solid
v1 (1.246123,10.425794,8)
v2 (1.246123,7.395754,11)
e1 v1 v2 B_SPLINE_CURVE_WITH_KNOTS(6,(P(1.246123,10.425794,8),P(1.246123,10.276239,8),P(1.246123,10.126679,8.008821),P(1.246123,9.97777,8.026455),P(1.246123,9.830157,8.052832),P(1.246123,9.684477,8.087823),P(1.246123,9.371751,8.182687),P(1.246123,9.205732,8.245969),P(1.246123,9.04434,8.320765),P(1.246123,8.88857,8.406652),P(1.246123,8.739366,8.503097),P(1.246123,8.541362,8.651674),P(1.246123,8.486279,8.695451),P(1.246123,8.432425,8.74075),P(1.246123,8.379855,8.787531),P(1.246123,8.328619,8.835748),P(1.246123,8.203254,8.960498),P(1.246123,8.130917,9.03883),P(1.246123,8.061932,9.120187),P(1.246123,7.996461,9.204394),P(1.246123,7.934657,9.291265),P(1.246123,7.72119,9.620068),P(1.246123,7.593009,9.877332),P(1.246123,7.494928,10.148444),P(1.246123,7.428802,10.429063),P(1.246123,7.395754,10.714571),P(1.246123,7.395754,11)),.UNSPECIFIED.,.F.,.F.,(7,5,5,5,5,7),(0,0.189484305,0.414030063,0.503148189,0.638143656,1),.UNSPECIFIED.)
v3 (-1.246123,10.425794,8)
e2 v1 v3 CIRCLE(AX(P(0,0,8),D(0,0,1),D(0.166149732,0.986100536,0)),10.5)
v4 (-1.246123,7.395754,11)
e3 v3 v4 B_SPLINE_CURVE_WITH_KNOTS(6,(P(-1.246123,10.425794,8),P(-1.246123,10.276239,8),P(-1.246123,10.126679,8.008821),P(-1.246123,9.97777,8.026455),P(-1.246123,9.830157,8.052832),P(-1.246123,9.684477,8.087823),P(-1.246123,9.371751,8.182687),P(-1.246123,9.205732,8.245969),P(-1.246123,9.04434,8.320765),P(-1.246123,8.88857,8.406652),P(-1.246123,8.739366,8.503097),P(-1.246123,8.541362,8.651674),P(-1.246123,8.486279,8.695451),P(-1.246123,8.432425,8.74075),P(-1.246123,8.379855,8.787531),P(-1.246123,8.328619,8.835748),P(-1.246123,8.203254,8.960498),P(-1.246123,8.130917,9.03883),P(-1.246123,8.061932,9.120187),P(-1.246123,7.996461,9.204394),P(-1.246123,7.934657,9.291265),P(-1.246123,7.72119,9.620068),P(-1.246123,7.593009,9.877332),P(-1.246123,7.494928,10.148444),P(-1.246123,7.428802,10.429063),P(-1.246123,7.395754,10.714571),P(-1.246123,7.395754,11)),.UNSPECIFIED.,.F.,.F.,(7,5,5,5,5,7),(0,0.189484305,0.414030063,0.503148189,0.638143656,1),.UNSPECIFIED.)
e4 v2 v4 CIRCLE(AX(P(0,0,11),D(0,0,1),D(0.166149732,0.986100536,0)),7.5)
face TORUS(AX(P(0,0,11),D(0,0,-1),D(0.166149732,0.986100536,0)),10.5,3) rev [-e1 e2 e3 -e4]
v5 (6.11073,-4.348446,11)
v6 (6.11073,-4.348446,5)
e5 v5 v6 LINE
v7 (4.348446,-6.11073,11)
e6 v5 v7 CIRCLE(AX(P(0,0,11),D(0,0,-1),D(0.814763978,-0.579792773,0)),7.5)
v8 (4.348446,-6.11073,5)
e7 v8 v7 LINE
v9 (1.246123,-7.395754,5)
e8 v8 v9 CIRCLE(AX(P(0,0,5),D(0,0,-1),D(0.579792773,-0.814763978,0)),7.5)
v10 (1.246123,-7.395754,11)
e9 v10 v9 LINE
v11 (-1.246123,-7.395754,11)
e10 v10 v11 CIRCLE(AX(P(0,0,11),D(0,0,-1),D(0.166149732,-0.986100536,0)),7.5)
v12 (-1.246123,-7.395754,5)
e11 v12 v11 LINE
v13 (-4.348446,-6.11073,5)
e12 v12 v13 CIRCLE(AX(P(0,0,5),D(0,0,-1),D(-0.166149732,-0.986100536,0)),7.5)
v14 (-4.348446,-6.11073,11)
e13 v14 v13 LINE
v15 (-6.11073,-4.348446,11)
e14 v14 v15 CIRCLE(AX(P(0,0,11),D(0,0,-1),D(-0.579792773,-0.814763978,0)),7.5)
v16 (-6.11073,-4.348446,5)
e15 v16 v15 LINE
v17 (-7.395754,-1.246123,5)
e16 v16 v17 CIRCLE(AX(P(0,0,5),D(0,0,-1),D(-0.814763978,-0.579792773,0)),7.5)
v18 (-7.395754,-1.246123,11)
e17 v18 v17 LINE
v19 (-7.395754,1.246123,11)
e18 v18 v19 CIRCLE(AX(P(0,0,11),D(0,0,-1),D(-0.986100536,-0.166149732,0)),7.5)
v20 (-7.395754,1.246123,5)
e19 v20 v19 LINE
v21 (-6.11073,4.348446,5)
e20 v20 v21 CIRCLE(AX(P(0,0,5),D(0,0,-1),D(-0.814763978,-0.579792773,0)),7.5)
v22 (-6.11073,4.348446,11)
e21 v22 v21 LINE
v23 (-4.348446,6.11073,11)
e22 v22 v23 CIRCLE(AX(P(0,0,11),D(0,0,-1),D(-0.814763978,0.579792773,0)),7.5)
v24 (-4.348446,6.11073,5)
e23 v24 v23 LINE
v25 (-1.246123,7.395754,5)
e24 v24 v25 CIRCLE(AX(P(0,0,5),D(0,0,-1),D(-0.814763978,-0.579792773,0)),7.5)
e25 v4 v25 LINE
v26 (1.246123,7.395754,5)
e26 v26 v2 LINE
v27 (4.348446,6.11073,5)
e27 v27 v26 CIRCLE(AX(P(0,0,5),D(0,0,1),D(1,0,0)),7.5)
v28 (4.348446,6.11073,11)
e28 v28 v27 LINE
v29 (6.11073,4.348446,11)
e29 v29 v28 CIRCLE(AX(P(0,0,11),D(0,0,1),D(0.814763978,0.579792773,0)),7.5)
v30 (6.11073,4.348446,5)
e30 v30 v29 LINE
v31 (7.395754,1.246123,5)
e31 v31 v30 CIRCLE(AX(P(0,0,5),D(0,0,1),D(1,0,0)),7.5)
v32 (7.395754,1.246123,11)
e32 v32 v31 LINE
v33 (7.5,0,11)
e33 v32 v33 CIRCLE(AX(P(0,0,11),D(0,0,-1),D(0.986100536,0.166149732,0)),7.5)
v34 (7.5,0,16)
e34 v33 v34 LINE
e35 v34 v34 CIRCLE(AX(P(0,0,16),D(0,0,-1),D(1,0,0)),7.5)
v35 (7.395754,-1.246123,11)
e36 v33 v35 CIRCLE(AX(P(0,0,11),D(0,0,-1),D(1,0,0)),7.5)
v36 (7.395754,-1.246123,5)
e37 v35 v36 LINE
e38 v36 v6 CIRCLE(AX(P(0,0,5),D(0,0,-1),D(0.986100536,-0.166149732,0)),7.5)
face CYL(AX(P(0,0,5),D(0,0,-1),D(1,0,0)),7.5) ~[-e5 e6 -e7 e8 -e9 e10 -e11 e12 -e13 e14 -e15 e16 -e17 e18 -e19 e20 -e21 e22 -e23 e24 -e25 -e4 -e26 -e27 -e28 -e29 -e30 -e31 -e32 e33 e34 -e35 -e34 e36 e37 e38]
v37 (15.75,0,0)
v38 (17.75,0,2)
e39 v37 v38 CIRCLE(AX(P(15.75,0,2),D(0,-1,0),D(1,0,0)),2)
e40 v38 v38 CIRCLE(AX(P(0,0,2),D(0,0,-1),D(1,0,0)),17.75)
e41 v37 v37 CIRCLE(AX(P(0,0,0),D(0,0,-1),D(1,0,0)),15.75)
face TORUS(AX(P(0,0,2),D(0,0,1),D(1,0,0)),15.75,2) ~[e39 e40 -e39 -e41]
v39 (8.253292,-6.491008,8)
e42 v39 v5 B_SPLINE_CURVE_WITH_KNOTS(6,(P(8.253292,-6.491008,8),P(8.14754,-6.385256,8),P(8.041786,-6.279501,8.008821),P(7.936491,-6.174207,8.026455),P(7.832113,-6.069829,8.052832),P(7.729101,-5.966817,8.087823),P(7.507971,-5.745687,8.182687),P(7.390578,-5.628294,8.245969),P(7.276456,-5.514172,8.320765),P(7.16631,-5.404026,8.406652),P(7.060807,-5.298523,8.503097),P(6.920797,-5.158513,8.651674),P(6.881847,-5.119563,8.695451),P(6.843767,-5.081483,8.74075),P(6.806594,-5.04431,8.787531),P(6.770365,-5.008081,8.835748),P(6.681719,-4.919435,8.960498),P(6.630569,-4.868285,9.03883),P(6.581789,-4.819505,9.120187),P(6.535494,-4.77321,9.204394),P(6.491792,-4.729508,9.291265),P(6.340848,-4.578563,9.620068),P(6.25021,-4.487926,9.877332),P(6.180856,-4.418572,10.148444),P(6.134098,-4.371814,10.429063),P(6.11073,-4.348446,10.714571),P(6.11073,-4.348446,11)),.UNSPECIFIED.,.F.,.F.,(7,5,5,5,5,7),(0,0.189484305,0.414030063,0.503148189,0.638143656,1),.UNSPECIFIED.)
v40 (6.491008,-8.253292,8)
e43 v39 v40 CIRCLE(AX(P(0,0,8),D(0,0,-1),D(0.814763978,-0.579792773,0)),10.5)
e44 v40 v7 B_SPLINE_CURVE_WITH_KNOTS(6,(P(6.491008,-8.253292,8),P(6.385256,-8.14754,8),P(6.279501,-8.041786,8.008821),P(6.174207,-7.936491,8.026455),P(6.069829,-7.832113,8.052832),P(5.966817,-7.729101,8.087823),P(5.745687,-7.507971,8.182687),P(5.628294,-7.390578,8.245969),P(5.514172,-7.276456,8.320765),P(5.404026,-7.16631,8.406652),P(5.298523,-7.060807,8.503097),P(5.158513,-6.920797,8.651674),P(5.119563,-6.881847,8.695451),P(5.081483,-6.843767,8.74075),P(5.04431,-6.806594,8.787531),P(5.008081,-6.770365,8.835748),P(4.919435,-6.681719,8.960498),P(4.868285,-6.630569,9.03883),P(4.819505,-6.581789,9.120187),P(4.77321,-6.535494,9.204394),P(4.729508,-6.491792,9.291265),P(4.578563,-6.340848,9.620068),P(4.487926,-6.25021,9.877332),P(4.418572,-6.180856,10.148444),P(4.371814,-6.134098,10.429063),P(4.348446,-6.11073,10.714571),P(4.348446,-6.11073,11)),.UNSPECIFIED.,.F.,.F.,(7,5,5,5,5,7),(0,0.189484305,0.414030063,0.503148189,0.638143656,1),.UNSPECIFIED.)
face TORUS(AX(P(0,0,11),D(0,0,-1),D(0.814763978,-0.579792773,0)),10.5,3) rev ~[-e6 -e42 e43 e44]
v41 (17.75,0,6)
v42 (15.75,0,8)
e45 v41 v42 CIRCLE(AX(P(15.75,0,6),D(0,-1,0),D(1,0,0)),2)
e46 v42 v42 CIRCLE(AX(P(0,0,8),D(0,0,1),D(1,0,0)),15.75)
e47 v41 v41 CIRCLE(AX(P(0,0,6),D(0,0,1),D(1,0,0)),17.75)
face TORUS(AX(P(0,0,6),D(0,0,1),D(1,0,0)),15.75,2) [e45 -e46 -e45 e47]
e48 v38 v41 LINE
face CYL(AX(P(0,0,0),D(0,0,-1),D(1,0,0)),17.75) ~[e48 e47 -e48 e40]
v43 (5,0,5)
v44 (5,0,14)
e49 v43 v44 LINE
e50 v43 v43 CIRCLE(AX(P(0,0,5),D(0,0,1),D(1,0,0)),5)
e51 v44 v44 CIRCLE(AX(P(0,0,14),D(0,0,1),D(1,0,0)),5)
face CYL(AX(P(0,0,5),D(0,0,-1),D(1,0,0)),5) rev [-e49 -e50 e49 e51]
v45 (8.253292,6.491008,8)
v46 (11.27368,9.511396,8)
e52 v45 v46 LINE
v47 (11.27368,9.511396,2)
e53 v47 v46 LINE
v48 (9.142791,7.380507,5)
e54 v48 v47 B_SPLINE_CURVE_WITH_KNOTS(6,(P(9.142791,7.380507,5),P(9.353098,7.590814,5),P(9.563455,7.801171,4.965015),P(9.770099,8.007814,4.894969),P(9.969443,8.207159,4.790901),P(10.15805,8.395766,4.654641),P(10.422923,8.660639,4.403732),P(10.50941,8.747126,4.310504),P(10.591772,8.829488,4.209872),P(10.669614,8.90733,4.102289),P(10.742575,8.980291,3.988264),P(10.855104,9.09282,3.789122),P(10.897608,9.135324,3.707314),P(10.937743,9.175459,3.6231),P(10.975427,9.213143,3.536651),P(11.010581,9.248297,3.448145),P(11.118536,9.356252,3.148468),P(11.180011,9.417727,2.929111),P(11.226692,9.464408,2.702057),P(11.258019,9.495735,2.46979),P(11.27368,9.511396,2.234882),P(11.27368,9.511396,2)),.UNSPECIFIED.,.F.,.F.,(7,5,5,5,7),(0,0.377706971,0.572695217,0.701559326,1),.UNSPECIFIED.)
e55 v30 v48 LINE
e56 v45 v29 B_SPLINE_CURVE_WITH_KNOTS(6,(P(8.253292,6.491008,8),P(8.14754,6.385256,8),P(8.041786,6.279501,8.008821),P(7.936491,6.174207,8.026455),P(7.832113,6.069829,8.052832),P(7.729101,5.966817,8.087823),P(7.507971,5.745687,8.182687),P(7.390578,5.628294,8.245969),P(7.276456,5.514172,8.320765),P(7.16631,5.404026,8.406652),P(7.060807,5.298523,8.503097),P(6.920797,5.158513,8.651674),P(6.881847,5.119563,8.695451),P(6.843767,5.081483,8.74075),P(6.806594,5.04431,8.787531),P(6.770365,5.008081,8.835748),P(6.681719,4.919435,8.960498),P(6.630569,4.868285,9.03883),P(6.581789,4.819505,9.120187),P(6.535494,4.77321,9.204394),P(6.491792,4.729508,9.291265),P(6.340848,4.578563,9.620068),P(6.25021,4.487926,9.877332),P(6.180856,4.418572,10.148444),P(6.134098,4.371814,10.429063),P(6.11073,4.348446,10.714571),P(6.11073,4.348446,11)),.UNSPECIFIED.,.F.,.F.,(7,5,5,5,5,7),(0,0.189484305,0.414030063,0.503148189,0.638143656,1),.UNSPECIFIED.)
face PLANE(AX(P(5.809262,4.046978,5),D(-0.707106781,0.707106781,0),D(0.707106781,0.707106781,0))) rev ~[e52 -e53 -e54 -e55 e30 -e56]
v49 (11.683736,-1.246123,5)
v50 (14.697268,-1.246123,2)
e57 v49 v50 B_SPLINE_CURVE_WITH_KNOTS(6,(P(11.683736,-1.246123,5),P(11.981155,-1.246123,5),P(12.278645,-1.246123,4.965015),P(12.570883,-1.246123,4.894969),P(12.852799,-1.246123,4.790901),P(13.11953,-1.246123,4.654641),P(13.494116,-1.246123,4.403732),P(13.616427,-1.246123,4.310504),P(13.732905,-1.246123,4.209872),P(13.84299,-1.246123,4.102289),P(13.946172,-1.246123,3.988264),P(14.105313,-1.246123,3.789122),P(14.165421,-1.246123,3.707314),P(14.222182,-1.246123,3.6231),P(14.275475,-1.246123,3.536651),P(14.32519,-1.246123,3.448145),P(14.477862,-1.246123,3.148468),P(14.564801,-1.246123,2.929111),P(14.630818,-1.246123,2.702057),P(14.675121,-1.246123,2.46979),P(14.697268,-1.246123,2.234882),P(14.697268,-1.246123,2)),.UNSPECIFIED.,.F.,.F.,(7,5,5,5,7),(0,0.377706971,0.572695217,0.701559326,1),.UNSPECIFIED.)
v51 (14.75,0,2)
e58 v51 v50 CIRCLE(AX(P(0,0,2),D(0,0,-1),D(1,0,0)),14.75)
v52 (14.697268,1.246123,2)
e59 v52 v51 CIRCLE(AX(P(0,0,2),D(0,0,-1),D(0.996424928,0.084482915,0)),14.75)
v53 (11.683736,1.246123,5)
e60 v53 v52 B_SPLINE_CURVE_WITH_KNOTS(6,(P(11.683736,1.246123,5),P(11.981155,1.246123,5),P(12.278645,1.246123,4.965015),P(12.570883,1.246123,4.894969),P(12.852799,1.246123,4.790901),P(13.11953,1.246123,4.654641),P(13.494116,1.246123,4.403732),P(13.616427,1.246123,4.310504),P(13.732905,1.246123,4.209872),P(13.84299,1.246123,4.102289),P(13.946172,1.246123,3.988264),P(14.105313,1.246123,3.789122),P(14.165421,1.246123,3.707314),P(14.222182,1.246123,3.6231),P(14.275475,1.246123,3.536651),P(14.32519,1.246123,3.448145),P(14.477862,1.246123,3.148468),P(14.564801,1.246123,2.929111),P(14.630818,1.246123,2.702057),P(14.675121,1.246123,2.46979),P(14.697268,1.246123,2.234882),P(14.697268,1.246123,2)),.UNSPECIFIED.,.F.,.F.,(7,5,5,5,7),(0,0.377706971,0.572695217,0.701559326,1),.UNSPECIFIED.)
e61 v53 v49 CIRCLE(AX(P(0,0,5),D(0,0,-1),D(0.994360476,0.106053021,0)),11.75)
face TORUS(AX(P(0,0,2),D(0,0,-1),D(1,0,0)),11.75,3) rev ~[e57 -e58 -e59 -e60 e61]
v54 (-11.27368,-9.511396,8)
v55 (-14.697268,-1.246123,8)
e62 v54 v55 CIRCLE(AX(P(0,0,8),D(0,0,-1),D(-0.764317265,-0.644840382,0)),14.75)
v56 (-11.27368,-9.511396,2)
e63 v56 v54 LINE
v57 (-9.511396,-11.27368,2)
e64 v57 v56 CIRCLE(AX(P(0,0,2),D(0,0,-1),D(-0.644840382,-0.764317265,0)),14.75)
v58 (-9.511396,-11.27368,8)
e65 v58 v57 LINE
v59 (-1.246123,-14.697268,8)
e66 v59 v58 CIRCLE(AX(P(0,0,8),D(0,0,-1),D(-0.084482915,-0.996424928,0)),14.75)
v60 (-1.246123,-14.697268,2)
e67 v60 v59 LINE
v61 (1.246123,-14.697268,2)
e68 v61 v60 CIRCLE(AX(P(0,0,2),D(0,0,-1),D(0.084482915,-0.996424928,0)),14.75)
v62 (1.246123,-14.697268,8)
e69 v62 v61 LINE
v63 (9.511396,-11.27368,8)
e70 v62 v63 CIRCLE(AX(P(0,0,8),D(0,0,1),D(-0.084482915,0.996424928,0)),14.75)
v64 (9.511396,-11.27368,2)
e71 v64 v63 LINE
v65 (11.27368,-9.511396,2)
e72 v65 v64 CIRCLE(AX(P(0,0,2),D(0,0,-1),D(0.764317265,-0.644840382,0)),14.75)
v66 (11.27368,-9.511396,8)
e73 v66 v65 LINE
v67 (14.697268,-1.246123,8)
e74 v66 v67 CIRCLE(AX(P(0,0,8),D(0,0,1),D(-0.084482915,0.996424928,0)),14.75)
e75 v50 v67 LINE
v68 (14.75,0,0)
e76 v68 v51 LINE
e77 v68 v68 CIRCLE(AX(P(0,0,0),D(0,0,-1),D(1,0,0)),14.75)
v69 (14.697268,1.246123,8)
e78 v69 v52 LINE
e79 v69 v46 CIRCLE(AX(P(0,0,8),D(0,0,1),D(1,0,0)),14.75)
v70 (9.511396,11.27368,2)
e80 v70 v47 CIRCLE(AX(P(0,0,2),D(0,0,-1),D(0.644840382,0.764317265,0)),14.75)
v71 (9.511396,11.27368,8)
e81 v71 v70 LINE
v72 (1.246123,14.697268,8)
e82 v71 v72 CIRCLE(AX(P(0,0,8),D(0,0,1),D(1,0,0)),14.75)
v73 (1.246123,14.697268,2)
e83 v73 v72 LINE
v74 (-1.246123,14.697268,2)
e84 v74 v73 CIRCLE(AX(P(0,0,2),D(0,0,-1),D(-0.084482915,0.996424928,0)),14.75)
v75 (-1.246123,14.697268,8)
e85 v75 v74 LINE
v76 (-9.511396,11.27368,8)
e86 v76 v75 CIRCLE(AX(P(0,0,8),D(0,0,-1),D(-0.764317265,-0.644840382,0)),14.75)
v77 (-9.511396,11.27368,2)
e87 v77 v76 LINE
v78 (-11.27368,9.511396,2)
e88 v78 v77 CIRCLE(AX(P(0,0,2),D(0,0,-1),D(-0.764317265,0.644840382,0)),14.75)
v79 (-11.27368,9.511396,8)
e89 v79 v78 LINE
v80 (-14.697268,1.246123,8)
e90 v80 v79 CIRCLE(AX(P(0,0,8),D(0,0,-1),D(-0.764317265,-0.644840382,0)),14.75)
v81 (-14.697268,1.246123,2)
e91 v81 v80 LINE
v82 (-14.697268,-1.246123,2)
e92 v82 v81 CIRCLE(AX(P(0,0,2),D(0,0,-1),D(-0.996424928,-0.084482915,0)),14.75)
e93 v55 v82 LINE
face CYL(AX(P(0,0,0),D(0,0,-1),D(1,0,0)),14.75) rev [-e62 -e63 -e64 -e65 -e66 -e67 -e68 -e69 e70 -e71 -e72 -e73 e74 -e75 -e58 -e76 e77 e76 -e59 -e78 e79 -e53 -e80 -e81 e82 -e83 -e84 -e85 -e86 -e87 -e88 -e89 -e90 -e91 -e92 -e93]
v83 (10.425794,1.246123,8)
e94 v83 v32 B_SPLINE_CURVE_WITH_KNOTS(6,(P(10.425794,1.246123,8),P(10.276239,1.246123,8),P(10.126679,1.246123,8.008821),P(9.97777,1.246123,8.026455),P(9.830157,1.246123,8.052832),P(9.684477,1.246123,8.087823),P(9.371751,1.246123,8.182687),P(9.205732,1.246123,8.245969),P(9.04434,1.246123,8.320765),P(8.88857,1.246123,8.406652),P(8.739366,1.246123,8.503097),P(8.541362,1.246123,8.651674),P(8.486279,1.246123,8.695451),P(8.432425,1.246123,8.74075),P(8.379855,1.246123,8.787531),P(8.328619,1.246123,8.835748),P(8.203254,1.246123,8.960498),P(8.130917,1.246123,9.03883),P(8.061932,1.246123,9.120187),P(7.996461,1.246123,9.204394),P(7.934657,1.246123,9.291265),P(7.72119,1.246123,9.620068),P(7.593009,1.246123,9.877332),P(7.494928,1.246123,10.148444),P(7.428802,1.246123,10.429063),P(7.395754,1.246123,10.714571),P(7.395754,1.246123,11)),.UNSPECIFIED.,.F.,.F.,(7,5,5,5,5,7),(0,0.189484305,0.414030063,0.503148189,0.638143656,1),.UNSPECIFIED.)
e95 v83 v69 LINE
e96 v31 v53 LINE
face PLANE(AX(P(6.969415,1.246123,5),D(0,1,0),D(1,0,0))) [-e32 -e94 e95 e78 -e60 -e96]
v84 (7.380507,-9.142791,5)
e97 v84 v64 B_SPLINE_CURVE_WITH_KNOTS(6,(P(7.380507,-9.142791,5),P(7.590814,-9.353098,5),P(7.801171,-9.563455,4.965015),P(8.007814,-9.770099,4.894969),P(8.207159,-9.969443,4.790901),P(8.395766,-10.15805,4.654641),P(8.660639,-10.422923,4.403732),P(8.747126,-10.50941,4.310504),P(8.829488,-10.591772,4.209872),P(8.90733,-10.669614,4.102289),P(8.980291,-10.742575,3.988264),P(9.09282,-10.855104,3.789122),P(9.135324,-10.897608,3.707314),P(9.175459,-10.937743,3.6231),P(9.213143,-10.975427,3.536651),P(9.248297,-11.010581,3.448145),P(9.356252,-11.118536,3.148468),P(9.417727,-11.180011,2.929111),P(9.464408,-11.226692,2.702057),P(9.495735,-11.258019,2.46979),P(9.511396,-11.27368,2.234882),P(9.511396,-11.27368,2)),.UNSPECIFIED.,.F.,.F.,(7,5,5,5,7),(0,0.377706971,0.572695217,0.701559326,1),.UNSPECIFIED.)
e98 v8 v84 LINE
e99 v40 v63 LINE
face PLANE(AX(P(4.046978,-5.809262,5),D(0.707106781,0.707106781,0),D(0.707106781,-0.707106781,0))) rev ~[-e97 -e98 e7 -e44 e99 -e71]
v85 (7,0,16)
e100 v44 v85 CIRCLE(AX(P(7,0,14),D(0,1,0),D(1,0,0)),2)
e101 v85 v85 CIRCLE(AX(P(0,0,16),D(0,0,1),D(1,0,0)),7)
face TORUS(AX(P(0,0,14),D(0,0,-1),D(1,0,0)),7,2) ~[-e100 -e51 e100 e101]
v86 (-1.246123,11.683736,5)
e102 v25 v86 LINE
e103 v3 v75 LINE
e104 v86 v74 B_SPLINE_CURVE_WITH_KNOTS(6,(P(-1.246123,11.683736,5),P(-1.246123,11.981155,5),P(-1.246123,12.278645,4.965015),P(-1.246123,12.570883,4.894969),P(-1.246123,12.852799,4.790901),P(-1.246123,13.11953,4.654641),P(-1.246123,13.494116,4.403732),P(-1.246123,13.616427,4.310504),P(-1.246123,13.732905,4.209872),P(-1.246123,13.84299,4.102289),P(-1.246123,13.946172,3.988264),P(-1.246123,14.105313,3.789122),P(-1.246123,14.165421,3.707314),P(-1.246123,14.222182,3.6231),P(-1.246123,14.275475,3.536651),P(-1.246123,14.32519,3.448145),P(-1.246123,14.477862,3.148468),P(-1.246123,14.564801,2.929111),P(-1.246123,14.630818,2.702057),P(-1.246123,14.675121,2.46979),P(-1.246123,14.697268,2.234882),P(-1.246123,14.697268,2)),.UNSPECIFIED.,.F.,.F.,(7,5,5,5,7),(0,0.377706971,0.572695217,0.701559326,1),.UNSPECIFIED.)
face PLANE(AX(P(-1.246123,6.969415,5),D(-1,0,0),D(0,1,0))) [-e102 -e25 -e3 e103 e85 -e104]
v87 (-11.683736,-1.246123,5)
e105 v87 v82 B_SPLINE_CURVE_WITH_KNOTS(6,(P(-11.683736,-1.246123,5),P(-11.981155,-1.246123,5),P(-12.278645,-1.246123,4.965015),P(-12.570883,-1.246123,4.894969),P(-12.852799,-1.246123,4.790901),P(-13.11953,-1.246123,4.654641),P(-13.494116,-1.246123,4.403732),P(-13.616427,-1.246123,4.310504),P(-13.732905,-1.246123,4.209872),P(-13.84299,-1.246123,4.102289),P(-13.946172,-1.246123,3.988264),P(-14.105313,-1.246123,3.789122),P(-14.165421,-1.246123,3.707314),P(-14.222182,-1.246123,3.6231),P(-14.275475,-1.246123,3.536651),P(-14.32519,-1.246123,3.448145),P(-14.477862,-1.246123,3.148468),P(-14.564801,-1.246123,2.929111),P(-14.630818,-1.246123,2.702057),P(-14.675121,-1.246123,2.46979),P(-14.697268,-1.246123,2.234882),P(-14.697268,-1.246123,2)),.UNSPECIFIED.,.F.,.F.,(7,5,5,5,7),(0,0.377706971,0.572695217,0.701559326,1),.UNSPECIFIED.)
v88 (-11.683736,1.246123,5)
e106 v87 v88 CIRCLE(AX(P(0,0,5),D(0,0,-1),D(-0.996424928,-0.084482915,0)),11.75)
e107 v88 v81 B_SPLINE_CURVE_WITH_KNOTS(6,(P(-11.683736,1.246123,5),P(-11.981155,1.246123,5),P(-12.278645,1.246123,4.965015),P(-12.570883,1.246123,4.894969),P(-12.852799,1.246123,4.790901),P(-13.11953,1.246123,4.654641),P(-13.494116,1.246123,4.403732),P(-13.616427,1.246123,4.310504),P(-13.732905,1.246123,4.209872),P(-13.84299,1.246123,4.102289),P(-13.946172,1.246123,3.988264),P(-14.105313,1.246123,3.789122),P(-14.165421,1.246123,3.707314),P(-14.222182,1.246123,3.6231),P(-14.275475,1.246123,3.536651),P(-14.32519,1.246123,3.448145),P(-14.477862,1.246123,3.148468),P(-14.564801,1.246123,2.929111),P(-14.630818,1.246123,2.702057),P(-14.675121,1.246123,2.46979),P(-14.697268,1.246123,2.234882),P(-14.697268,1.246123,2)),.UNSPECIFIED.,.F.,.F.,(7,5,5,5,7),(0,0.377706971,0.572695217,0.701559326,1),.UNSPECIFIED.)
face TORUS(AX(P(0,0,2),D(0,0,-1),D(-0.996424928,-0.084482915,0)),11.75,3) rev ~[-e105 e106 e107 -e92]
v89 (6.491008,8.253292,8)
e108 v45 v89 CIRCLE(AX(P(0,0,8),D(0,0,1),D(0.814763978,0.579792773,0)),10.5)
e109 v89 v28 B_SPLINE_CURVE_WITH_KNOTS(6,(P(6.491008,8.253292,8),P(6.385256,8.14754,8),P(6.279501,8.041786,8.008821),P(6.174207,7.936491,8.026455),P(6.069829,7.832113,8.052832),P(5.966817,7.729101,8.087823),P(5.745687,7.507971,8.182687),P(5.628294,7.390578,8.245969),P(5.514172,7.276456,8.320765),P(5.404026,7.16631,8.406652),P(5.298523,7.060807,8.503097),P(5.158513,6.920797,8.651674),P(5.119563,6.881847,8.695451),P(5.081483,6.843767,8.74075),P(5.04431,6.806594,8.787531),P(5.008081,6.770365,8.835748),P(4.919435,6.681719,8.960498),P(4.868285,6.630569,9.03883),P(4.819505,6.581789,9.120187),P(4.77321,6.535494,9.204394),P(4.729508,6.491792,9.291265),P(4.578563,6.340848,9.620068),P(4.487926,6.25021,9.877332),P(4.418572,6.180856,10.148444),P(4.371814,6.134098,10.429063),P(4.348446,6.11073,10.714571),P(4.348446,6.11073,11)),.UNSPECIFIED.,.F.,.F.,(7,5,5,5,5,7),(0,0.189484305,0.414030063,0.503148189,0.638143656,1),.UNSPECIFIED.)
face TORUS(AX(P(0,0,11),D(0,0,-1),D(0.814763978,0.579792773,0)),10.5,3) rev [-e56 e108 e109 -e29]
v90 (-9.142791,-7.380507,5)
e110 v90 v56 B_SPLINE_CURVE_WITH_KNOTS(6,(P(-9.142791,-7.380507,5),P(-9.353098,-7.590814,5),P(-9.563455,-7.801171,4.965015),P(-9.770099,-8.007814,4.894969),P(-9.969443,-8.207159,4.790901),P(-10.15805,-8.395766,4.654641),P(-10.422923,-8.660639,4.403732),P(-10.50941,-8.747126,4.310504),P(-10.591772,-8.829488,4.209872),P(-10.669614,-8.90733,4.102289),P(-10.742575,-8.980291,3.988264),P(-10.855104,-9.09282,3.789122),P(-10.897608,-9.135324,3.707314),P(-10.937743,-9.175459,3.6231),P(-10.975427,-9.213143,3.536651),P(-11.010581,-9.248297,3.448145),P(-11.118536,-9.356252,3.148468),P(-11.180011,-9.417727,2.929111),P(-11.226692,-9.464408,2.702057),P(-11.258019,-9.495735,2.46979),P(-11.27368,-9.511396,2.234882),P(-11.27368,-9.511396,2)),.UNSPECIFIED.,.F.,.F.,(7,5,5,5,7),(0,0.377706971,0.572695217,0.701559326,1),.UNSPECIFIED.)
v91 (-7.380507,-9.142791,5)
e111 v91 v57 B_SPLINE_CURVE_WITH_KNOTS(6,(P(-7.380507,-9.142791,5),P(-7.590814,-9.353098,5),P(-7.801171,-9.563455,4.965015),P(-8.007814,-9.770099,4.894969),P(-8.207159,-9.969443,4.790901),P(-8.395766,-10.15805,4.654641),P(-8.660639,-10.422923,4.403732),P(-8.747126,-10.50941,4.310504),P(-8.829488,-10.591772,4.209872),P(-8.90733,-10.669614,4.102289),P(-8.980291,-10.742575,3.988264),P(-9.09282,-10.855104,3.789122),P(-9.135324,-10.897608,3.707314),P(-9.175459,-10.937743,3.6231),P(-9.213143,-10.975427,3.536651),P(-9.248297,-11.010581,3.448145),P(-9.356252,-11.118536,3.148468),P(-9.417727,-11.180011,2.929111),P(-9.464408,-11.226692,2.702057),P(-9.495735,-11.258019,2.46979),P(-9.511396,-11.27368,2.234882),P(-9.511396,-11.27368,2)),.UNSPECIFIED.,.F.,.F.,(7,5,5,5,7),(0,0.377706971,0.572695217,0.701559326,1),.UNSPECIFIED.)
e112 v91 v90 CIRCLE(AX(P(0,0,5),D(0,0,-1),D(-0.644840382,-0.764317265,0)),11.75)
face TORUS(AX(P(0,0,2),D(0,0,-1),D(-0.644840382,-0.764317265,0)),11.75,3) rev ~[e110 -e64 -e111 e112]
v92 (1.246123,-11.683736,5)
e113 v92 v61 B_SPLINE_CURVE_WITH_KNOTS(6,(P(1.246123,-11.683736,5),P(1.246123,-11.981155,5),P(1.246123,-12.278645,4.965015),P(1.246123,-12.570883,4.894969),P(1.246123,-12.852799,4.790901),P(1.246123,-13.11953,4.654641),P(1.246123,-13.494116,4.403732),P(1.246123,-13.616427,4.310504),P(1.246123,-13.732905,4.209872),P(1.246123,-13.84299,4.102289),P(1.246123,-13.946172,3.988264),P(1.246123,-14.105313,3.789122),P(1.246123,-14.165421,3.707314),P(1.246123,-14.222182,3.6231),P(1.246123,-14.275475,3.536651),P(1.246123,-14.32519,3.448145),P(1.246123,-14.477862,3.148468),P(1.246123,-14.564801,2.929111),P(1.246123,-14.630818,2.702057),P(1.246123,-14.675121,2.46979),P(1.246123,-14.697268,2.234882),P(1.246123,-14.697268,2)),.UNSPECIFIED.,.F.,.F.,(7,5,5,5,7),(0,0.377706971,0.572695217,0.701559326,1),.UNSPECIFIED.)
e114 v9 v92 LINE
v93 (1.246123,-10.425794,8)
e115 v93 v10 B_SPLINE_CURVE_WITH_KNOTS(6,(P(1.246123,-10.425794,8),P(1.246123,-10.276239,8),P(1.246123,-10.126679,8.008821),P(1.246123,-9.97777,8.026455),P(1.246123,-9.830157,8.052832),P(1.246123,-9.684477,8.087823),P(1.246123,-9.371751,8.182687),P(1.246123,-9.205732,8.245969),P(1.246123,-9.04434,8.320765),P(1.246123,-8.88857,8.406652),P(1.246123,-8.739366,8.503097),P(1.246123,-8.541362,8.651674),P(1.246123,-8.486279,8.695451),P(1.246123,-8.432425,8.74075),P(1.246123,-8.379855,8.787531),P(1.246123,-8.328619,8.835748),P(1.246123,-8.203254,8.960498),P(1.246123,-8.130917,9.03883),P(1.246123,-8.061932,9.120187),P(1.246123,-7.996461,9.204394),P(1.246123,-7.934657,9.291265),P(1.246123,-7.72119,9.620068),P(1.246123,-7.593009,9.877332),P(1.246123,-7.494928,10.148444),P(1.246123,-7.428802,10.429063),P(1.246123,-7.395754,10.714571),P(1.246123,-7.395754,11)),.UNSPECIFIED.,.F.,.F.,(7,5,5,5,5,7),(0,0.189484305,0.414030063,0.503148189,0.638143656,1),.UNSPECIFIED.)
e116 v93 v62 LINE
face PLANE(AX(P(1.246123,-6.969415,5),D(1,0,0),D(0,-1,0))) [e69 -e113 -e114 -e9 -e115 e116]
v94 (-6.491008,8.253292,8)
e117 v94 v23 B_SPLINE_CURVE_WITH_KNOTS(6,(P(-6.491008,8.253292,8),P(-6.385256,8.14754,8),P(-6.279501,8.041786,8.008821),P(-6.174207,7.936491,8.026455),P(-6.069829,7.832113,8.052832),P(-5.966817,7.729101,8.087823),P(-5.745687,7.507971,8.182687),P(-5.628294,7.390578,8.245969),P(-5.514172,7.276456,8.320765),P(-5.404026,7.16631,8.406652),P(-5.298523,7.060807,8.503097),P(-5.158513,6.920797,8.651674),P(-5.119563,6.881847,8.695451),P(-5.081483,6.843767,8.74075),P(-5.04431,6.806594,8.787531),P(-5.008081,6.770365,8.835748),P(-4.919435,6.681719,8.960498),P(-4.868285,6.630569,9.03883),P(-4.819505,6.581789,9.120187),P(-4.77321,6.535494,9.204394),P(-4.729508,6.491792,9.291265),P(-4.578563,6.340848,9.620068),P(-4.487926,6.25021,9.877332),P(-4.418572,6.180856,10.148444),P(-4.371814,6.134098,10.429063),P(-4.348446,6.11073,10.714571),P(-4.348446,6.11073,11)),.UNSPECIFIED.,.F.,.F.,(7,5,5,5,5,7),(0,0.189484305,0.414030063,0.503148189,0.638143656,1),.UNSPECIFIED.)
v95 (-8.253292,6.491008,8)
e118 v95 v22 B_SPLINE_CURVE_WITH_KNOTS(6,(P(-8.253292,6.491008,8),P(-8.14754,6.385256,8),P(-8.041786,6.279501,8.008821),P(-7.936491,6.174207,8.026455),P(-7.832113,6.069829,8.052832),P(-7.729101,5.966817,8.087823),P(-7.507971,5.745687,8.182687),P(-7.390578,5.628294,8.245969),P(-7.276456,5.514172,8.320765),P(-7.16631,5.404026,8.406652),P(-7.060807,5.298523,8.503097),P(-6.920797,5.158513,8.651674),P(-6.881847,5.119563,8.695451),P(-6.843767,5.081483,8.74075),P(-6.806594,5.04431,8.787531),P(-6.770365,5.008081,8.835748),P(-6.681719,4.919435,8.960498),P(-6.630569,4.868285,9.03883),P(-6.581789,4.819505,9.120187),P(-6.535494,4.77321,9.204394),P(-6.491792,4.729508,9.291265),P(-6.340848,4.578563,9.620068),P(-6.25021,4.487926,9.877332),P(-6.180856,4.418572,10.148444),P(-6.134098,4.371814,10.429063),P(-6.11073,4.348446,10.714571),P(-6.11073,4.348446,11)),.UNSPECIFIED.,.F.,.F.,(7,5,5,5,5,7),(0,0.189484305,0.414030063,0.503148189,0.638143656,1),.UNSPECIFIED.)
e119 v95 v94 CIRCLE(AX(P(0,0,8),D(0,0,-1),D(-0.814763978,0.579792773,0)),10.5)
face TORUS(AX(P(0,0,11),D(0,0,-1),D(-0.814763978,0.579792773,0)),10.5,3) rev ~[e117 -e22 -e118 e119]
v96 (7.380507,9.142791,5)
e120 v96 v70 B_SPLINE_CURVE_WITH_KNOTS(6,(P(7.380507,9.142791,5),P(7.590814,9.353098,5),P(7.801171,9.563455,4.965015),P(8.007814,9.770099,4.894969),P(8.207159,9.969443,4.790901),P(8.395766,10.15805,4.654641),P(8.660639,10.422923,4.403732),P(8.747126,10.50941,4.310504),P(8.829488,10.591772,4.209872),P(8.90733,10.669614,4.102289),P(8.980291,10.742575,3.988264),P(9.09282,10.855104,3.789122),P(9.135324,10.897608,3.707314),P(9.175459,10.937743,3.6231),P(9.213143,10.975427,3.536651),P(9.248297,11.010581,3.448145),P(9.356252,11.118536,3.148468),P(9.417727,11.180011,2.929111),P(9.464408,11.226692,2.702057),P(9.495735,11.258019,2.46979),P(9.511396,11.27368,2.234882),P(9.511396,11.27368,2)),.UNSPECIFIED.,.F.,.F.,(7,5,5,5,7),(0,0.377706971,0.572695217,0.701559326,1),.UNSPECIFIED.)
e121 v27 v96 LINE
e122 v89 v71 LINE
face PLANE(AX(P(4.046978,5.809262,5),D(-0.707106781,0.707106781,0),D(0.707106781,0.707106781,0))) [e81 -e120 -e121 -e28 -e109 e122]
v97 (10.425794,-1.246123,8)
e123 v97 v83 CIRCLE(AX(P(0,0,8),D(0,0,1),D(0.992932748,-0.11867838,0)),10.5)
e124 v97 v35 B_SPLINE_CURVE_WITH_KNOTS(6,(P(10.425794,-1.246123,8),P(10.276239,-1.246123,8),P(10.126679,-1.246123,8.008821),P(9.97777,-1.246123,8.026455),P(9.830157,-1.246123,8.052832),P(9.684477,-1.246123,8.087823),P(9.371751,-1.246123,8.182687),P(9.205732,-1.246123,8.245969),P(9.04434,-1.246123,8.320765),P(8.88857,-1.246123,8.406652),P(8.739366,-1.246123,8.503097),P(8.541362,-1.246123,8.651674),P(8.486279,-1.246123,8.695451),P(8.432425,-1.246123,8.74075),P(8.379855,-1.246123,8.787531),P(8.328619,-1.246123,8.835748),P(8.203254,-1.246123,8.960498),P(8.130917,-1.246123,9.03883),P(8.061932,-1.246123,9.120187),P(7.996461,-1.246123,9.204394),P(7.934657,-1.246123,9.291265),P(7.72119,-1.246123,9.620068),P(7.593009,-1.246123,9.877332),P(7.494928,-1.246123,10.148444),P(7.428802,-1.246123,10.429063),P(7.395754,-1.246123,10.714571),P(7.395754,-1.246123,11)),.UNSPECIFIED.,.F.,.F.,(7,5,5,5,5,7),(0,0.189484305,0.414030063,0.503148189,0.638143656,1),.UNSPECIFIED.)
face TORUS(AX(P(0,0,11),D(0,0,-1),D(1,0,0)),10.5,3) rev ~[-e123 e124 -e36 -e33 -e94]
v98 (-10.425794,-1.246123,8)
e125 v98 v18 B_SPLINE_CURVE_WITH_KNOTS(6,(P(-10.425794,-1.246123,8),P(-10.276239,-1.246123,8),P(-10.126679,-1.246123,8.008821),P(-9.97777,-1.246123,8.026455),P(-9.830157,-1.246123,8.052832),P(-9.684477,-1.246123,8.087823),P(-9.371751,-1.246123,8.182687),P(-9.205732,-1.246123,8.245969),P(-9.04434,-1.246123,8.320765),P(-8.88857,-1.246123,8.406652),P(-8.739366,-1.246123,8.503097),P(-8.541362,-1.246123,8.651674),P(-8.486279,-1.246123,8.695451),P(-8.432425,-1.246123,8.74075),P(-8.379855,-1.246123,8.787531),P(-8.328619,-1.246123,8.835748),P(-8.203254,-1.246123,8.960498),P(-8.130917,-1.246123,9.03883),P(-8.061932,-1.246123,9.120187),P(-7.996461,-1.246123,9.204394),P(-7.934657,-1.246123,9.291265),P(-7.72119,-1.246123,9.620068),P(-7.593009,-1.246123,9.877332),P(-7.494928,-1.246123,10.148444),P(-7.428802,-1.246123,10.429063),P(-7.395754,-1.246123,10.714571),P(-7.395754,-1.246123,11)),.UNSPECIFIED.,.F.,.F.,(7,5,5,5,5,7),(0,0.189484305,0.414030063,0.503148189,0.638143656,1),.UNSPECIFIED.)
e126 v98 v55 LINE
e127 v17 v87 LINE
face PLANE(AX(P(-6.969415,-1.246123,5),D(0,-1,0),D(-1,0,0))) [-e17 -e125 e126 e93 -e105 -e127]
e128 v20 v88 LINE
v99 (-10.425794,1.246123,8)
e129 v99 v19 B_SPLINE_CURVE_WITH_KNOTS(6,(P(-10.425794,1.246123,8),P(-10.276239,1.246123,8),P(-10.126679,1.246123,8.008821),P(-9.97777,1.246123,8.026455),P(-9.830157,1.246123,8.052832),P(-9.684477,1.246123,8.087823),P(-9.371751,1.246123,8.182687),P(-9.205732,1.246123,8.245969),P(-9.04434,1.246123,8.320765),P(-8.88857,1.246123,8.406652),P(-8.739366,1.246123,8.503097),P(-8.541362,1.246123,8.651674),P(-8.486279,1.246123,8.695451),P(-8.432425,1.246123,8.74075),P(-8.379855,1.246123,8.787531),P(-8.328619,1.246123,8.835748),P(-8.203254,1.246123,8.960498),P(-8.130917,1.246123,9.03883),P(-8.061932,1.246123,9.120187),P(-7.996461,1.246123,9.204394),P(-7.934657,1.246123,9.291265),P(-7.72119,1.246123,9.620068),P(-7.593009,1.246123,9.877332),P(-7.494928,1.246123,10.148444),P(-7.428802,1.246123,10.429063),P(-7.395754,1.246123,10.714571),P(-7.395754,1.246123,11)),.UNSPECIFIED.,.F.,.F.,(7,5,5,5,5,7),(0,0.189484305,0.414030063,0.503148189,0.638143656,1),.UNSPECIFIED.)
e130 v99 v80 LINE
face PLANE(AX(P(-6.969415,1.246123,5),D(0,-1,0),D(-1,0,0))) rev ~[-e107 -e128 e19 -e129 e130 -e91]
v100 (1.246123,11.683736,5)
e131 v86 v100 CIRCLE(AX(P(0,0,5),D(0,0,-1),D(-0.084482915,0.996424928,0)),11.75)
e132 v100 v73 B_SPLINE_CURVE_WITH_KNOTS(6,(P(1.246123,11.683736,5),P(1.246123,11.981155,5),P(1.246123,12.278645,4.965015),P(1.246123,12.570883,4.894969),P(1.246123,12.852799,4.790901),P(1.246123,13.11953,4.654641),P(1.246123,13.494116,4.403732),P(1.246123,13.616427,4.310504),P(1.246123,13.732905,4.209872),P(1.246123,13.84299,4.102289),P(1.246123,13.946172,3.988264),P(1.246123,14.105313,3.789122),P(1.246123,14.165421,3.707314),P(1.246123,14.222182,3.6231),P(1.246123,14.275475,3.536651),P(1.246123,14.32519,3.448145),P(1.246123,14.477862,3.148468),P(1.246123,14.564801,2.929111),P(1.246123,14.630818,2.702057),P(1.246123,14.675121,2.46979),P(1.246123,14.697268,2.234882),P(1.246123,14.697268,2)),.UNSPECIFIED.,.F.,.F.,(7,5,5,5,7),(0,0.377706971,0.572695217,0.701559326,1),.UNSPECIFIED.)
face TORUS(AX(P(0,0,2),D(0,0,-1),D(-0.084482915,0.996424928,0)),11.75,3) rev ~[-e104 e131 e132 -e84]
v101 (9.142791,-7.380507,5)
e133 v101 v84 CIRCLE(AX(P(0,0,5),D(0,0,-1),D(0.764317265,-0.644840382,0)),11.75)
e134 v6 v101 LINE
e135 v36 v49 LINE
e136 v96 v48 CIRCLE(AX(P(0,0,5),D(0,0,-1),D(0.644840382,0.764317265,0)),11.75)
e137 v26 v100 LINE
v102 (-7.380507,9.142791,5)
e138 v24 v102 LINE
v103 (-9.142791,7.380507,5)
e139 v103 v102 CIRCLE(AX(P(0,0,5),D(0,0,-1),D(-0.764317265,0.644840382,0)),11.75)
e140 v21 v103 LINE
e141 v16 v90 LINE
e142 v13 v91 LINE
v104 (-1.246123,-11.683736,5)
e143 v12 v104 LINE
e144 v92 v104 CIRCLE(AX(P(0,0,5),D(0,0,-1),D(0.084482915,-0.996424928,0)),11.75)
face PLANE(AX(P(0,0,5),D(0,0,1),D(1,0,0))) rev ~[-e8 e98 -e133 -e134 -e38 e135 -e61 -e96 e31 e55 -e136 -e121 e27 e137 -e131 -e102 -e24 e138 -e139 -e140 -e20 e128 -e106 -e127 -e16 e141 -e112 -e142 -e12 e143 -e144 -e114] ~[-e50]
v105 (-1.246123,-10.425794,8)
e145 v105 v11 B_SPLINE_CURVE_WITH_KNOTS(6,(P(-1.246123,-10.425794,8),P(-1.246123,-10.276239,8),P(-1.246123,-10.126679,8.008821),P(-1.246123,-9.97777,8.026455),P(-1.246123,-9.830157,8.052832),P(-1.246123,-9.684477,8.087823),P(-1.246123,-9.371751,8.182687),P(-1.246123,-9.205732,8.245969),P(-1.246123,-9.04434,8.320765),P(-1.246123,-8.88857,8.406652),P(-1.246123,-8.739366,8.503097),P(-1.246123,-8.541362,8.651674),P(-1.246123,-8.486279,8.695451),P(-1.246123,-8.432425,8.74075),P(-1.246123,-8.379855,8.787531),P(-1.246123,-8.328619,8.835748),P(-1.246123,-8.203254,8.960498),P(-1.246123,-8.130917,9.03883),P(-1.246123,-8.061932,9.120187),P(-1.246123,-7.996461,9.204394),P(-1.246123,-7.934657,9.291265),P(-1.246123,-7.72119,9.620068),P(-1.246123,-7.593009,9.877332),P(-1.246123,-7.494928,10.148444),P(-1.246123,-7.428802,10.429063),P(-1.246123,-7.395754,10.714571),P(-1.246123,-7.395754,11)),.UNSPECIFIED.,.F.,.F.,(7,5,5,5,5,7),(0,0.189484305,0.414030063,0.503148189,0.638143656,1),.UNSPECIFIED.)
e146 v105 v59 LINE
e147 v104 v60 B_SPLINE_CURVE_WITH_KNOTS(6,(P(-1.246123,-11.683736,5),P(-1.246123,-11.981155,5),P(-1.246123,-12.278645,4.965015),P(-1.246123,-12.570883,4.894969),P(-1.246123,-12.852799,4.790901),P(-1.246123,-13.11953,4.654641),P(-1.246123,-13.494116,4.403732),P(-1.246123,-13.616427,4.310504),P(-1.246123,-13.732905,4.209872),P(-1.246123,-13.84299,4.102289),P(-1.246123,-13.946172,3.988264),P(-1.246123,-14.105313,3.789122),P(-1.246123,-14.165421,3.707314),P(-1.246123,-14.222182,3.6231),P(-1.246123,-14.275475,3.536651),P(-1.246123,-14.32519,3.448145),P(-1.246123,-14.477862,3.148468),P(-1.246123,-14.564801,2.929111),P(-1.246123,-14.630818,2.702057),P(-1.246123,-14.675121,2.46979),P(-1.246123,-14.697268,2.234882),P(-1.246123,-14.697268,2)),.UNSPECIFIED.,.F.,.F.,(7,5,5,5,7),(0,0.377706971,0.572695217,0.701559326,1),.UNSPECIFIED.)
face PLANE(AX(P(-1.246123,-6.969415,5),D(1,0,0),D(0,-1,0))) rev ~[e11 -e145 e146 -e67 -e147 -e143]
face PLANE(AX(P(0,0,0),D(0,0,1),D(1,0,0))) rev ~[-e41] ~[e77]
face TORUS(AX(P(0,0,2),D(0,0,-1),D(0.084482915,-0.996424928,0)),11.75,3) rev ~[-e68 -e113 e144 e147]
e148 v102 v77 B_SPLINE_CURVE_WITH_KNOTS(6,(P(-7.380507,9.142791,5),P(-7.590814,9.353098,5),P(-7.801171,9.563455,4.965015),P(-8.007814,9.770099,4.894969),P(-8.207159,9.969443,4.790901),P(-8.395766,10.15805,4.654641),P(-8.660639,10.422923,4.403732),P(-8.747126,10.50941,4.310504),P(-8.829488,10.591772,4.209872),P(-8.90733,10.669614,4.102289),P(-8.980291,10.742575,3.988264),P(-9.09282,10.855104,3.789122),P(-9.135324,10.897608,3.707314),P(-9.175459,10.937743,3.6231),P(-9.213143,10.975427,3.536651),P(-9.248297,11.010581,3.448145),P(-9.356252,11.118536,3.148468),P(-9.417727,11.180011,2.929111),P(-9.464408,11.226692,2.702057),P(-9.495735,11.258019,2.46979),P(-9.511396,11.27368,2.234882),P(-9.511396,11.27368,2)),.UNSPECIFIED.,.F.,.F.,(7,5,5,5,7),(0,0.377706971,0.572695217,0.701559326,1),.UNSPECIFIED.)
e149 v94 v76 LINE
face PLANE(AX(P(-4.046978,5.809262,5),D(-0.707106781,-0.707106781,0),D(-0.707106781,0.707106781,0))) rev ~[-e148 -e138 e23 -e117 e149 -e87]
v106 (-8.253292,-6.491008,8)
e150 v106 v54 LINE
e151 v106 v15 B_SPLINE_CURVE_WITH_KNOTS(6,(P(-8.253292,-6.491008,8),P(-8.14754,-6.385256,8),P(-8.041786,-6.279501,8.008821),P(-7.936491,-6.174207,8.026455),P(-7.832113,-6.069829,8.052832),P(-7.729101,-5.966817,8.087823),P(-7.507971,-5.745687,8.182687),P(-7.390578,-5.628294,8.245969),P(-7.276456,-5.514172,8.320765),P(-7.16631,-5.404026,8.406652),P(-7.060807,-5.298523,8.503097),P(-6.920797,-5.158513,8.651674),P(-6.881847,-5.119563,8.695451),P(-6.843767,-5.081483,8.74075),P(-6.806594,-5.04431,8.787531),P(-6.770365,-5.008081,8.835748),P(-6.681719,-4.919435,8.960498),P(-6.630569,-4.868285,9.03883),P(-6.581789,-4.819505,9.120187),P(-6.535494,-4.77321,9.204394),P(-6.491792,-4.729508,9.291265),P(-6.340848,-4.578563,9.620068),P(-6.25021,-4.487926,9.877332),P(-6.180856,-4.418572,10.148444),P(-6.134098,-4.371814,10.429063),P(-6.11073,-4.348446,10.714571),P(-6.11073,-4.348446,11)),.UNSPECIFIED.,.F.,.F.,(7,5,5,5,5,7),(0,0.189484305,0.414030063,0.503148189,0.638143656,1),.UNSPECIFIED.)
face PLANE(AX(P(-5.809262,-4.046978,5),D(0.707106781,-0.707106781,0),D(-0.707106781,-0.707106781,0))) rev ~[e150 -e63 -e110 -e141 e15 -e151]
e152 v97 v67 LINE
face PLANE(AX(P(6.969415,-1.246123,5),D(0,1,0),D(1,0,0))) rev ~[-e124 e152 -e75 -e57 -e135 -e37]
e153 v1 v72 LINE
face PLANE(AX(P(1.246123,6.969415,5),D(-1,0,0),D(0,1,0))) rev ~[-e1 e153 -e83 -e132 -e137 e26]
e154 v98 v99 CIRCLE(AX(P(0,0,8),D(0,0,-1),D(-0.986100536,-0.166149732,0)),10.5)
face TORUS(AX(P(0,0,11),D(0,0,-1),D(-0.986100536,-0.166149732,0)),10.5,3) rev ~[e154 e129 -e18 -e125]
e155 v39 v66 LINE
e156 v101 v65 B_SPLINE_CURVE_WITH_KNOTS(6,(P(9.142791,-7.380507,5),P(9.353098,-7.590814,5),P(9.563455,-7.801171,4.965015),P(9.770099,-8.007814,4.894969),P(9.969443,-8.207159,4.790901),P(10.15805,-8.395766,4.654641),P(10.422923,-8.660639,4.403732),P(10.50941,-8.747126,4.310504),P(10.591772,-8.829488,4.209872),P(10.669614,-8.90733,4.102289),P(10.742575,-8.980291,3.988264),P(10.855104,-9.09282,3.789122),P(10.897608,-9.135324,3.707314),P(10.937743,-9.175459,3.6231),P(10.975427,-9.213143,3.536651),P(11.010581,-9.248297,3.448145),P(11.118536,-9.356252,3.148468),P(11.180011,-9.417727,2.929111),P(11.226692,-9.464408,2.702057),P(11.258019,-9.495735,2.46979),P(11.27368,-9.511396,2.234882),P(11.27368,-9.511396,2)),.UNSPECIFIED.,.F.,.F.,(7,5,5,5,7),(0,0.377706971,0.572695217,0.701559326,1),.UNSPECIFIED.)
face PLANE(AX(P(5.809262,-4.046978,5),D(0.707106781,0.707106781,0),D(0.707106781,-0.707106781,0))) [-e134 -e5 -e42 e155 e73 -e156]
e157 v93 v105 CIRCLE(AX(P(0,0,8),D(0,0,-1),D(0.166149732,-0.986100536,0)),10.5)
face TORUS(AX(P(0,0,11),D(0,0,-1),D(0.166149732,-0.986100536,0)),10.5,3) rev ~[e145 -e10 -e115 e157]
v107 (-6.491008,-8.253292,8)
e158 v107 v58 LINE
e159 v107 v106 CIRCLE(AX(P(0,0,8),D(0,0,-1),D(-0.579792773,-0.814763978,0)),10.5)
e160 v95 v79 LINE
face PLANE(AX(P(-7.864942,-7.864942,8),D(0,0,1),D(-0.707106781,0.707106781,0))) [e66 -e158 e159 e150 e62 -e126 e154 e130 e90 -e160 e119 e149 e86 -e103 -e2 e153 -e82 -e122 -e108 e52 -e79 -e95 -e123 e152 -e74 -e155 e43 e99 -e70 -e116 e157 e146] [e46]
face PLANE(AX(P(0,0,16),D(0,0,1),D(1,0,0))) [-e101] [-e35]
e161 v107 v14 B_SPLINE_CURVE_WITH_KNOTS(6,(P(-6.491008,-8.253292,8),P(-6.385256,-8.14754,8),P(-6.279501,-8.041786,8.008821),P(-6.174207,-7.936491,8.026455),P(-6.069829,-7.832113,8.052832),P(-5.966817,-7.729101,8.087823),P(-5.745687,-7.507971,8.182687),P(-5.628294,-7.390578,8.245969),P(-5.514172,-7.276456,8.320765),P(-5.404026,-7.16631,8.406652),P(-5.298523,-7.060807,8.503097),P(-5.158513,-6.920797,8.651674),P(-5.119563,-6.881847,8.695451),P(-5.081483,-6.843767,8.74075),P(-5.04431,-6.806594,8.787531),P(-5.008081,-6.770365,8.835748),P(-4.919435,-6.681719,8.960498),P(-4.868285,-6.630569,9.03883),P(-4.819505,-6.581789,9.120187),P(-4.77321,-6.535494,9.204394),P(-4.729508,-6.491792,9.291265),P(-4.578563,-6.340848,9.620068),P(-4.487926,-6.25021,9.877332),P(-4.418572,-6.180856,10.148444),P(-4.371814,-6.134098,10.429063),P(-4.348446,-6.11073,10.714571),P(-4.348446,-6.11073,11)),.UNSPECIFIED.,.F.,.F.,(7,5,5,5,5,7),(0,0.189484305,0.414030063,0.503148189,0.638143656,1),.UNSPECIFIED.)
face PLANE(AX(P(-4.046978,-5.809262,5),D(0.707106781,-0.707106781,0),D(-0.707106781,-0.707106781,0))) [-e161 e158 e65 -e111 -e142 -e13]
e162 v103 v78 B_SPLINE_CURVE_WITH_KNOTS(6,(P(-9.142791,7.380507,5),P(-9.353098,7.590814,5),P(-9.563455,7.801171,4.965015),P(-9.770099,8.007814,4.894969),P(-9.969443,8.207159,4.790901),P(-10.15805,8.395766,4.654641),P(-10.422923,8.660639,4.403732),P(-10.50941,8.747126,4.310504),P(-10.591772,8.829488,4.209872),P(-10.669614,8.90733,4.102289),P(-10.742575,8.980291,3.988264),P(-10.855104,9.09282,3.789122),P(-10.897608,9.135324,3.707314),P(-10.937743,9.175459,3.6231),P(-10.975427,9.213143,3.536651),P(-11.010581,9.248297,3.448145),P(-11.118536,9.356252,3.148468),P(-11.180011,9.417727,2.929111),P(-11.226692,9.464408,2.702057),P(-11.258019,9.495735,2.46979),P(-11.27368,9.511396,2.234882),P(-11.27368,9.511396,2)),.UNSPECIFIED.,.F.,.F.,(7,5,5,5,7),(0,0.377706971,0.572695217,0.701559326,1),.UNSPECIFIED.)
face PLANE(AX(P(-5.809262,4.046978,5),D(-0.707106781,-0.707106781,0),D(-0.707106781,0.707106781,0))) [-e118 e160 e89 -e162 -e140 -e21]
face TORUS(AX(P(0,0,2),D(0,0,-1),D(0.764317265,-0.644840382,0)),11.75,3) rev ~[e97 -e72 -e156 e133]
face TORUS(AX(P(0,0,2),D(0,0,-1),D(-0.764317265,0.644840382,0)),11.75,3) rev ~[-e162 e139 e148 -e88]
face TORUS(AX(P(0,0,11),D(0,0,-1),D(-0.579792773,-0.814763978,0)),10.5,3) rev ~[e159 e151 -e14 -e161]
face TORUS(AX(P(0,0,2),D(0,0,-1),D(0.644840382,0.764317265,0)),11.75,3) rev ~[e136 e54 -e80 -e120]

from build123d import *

# Parameters (mm, degrees)
F0_R     = 17.75
F0_R_2   = 14.75
F1_DEPTH = 8
F3_R     = 7.5
F3_R_2   = 5
F4_DEPTH = 11
F5_W     = 2.4922459852
F5_H     = 8.3065871149
F6_DEPTH = 3
F8_COUNT = 8
F9_R     = 3
F10_R    = 2


with BuildPart() as f1:
    # F0 (on Top) → F1 (new body)
    with BuildSketch(Plane.XY):
        Circle(F0_R)
        Circle(F0_R_2, mode=Mode.SUBTRACT)
    extrude(amount=F1_DEPTH)



with BuildPart() as f4:
    # F3 (on offset) → F4 (new body)
    with BuildSketch(Plane.XY.offset(5)):
        Circle(F3_R)
        Circle(F3_R_2, mode=Mode.SUBTRACT)
    extrude(amount=F4_DEPTH)


with BuildPart() as f1_1:
    add(f1.part)

    add(f4.part)  # F6 merges F4
    # F5 (on offset) → F6 (join)
    with BuildSketch(Plane.XY.offset(5)):
        with Locations((0, 11.1227082089)):
            Rectangle(F5_W, F5_H)
    extrude(amount=F6_DEPTH)

    # F8: F1 ×8 about axis
    f8_axis = Axis((0, 0, 7.9989284277), (0, 0, -1))


with BuildPart() as f1_2:
    add(f1_1.part)
    for i in range(1, F8_COUNT):
        add(f1_1.part.rotate(f8_axis, i * 360 / F8_COUNT))

    # F9
    f9_edges = [f1_2.edges().sort_by_distance(p)[0] for p in [
        (7.473893, 0.625238, 8),
        (7.473893, -0.625238, 8),
        (5.303301, -5.303301, 8),
        (0, -7.5, 8),
        (-5.303301, -5.303301, 8),
        (-7.5, 0, 8),
        (-5.303301, 5.303301, 8),
        (0, 7.5, 8),
        (5.303301, 5.303301, 8),
        (14.736811, 0.623619, 5),
        (10.429825, 10.429825, 5),
        (0, 14.75, 5),
        (-10.429825, 10.429825, 5),
        (-14.75, 0, 5),
        (-10.429825, -10.429825, 5),
        (0, -14.75, 5),
        (10.429825, -10.429825, 5),
        (14.736811, -0.623619, 5),
    ]]
    fillet(f9_edges, radius=F9_R)

    # F10
    f10_edges = [f1_2.edges().sort_by_distance(p)[0] for p in [
        (-17.75, 0, 8),
        (-17.75, 0, 0),
        (-5, 0, 16),
    ]]
    fillet(f10_edges, radius=F10_R)


solid = f1_2.part
